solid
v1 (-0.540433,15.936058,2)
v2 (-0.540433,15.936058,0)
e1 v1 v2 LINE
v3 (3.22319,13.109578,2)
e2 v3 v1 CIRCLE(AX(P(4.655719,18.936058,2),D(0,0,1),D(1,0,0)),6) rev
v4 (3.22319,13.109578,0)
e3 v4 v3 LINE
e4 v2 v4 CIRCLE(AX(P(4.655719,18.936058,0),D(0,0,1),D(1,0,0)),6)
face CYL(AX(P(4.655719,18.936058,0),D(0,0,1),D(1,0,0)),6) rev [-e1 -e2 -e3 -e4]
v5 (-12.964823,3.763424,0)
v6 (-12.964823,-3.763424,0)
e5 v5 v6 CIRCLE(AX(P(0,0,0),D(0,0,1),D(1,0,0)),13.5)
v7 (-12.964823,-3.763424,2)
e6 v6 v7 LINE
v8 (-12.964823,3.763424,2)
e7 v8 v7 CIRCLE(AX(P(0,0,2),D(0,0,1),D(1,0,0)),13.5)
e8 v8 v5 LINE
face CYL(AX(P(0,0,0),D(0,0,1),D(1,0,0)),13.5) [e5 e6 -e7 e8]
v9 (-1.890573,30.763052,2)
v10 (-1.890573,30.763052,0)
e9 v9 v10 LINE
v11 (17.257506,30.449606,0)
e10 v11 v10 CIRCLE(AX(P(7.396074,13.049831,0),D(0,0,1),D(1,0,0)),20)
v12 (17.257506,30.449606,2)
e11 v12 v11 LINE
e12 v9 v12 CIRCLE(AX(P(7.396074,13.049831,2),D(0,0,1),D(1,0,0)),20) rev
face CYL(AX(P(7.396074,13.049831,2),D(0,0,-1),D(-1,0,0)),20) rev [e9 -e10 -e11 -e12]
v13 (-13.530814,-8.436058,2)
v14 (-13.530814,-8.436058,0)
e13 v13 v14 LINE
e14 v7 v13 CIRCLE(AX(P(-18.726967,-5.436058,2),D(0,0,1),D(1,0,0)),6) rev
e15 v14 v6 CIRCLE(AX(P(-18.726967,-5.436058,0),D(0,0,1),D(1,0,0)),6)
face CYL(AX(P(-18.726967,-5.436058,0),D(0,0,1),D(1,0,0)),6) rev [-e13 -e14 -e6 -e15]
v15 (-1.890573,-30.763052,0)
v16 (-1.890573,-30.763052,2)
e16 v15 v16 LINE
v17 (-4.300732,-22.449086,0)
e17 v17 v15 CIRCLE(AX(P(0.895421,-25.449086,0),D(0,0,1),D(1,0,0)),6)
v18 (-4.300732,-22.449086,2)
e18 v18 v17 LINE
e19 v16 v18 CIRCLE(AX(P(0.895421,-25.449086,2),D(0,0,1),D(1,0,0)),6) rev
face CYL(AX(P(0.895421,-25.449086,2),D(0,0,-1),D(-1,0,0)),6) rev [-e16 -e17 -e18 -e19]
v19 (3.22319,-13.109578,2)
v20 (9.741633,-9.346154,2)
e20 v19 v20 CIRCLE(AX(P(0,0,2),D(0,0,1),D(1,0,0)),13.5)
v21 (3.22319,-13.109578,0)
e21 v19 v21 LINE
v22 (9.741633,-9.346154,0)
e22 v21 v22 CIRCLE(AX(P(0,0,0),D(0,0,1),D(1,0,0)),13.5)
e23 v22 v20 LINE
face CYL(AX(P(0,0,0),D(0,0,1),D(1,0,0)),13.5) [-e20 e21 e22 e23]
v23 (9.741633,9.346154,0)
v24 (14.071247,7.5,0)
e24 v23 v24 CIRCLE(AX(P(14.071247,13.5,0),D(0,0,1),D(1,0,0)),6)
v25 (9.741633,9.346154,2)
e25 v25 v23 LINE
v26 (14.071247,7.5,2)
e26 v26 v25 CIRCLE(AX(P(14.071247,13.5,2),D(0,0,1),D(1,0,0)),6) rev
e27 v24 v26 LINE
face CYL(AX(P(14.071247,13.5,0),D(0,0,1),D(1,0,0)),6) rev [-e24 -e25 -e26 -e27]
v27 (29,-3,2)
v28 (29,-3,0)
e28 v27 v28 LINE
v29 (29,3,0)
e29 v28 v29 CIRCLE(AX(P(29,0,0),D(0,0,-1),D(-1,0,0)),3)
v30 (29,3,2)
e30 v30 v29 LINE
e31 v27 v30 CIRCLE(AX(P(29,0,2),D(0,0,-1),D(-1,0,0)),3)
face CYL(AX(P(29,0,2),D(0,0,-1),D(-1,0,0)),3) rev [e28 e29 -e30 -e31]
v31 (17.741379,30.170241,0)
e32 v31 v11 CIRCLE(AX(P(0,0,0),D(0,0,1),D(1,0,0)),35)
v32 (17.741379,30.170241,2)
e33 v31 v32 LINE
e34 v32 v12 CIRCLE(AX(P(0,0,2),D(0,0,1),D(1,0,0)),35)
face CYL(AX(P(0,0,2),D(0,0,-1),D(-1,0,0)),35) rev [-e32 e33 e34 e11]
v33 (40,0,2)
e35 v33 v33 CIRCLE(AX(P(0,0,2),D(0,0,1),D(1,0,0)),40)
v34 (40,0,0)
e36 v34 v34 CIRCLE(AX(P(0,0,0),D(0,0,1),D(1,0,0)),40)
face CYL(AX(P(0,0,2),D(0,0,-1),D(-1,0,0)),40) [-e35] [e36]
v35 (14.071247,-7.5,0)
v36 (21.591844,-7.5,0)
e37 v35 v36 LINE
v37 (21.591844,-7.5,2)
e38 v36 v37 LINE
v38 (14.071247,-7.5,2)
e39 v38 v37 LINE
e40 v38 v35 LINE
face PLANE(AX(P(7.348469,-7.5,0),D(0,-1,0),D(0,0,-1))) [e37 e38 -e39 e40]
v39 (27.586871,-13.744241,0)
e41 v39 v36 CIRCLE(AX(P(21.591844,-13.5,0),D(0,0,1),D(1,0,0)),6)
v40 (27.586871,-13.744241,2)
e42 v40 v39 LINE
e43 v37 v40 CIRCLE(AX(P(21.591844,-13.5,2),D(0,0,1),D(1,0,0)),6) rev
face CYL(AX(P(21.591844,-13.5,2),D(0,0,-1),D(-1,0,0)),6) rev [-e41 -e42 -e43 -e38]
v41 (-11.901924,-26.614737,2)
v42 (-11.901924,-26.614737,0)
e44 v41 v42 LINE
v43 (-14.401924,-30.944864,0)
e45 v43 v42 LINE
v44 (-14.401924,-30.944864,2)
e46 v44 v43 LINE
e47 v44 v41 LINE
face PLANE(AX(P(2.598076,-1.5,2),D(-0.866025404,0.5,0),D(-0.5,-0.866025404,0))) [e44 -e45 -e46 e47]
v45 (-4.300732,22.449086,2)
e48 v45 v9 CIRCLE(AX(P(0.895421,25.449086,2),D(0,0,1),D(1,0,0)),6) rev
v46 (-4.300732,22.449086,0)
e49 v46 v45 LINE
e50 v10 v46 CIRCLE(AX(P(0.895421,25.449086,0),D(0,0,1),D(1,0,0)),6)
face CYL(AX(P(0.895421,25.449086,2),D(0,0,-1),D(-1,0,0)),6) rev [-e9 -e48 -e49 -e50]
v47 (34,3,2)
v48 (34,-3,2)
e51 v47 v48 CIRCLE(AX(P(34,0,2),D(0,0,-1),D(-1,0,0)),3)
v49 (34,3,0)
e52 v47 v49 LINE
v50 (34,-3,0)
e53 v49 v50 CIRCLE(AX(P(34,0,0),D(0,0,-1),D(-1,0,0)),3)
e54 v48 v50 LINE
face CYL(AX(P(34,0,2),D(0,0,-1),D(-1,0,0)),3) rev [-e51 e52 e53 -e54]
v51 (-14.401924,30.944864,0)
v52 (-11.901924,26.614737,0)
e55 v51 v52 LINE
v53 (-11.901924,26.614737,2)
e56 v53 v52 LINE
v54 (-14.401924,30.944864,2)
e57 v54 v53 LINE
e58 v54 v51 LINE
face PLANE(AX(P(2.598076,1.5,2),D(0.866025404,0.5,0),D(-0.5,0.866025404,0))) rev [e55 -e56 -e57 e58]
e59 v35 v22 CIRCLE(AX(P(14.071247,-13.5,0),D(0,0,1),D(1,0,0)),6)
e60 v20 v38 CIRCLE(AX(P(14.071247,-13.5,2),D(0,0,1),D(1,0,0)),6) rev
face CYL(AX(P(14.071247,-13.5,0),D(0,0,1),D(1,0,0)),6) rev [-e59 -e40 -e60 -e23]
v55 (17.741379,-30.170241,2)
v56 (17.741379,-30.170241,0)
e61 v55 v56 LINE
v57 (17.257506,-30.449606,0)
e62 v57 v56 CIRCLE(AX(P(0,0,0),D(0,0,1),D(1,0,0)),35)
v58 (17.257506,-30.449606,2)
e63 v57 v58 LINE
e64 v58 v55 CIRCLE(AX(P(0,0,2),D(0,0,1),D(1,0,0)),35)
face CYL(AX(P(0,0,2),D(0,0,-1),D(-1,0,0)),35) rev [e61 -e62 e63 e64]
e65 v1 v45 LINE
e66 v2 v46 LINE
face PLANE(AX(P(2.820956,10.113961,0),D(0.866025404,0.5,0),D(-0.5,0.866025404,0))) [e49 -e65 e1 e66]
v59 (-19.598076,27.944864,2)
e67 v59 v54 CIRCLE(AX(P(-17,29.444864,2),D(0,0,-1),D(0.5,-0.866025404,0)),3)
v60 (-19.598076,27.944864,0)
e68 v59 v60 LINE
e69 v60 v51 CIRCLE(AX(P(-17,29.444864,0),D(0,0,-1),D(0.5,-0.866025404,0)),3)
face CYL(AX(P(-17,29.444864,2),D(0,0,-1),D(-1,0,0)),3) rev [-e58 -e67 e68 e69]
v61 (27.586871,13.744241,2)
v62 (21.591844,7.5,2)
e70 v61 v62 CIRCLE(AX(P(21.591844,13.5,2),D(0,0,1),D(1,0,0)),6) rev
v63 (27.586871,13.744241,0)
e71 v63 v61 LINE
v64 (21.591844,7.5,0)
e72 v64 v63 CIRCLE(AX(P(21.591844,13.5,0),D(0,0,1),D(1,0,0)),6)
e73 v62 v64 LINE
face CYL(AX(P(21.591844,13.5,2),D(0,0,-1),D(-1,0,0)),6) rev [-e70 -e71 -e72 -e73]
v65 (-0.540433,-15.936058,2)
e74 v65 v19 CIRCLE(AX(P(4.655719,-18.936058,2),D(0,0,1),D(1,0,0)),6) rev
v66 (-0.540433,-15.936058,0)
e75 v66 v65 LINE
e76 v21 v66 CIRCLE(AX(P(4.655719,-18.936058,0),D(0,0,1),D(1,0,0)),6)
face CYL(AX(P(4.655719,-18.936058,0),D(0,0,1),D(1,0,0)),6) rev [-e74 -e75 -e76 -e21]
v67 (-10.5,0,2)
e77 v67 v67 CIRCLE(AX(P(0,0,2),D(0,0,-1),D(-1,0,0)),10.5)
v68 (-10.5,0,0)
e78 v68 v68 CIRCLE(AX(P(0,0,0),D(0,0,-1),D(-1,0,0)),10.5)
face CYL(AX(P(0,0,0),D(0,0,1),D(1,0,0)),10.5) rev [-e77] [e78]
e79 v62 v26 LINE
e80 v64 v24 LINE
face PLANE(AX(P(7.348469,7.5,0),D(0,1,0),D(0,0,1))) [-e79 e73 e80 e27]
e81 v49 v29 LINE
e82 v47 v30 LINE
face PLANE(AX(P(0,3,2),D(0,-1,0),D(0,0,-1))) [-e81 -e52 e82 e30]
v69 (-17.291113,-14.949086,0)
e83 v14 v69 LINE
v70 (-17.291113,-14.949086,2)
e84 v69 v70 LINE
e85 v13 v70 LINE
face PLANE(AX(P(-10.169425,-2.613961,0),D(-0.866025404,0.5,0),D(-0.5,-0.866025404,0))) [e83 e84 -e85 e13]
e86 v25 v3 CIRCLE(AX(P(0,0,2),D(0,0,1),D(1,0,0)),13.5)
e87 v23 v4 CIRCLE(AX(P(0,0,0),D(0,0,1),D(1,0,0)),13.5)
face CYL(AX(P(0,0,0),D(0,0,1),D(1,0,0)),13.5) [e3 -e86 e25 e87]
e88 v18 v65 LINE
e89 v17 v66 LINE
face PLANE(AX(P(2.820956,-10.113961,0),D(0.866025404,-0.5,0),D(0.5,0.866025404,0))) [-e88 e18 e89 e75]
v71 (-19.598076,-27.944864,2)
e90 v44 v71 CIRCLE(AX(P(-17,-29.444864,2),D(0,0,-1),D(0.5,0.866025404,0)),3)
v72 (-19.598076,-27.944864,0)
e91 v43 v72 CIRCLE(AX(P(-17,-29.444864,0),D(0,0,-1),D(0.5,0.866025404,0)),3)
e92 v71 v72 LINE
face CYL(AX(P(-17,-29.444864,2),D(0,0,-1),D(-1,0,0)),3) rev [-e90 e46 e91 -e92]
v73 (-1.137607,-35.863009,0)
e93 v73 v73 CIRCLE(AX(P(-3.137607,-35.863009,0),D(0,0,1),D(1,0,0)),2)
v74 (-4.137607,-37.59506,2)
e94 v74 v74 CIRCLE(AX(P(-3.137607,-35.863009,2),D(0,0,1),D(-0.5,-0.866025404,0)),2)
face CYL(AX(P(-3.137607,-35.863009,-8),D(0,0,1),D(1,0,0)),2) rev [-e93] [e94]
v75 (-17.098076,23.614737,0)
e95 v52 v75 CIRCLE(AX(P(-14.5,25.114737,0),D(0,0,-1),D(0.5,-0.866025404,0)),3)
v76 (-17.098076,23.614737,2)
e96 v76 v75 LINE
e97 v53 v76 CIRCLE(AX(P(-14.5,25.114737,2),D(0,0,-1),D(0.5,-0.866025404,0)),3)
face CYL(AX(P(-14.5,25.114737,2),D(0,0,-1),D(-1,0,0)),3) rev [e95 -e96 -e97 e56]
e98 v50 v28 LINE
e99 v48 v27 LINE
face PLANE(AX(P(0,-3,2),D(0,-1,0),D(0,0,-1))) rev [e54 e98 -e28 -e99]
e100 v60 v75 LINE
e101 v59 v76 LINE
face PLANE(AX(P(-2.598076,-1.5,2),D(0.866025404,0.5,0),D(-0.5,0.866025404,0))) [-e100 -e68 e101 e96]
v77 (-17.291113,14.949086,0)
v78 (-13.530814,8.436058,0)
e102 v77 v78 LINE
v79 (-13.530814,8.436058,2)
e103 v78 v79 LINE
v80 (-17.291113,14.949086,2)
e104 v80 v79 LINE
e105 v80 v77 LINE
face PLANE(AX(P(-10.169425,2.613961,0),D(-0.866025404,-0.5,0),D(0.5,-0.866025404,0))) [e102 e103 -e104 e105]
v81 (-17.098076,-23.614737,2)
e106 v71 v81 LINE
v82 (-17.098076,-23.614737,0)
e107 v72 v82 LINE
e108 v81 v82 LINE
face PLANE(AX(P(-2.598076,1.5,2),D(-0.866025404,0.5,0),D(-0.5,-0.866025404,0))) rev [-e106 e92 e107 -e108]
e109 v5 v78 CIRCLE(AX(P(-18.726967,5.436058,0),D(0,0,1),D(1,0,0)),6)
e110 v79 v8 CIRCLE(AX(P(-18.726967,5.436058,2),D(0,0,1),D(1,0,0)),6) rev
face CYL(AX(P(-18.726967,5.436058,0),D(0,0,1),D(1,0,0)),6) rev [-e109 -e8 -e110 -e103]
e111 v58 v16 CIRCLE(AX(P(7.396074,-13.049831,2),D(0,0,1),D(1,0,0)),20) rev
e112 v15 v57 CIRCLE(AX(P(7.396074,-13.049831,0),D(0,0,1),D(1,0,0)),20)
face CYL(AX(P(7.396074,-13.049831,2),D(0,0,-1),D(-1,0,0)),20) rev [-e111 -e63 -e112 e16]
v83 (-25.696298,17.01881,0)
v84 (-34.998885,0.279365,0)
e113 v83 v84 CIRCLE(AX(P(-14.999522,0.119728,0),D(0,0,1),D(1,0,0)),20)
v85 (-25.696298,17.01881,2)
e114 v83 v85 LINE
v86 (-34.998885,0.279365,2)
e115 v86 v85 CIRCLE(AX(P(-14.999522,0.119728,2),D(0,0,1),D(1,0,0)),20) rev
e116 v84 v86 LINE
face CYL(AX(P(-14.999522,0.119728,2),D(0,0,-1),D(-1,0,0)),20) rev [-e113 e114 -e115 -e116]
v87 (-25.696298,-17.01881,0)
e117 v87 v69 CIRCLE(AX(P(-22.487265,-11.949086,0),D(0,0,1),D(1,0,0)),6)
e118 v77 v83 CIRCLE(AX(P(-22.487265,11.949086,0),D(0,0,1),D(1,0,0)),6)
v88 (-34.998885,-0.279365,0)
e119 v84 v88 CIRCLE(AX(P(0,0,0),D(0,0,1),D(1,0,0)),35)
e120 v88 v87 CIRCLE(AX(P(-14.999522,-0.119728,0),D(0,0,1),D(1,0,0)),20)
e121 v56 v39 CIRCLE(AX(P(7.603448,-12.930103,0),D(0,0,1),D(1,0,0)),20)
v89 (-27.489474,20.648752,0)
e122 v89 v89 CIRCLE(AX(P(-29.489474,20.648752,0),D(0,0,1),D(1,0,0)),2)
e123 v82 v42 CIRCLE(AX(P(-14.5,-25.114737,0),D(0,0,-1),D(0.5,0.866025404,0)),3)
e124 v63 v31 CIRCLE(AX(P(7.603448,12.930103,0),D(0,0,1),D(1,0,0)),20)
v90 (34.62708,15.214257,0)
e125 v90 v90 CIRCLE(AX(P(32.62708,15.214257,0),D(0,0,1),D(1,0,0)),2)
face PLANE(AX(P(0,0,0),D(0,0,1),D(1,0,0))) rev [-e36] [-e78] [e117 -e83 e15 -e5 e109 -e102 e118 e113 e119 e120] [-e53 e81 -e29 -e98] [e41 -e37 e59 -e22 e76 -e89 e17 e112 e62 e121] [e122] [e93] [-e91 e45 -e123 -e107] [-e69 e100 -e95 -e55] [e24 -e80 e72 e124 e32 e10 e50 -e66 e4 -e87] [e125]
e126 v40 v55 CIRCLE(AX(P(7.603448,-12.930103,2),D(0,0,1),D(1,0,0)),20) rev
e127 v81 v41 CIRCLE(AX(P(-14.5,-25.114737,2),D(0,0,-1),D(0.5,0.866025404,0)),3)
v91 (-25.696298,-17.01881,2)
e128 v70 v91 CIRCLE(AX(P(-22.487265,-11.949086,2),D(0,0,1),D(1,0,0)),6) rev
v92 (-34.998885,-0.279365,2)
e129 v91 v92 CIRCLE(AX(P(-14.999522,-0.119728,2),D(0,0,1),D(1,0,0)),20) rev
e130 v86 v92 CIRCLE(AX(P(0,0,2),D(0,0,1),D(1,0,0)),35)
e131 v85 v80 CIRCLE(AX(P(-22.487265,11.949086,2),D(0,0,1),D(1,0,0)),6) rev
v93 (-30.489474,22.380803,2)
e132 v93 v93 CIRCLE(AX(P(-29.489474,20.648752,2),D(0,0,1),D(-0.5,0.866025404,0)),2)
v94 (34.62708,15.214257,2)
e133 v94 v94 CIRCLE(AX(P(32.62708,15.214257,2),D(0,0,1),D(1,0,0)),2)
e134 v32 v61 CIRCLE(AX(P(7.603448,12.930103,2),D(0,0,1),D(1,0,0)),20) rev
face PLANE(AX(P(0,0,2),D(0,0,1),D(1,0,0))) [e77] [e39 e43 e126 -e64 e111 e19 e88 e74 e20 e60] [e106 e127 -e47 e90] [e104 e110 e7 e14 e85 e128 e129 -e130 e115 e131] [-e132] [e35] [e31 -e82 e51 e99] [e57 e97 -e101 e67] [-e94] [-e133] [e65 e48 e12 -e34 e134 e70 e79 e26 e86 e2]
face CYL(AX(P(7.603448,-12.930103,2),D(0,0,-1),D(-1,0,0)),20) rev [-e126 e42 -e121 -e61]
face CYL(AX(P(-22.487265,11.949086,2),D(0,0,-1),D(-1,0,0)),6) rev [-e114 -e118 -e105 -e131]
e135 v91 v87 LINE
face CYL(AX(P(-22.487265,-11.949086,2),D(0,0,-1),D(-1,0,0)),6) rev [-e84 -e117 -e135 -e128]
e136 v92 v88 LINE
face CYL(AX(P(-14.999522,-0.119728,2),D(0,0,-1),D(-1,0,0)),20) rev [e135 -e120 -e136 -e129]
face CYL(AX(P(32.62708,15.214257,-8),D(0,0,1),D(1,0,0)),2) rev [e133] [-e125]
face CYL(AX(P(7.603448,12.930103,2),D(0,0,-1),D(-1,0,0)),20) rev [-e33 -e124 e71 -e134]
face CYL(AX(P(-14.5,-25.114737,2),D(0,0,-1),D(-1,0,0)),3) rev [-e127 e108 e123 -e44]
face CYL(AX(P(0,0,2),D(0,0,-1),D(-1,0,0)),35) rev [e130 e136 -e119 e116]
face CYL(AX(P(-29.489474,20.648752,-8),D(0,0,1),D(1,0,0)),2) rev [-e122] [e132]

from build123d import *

# Parameters (mm, degrees)
SKETCH1_R                = 40
SKETCH1_R_2              = 35
BOSS_EXTRUDE1_DEPTH      = 2
BOSS_EXTRUDE2_DEPTH      = 2
SKETCH3_R                = 3
CUT_EXTRUDE1_DEPTH       = 2
FILLET1_DEPTH            = 2
SKETCH4_R                = 2
CUT_EXTRUDE2_DEPTH       = 10
BOSS_EXTRUDE3_START      = -2
BOSS_EXTRUDE3_DEPTH      = 2
BOSS_EXTRUDE4_START      = -2
SKETCH7_R                = 13.5
SKETCH7_R_2              = 10.5
BOSS_EXTRUDE4_DEPTH      = 2
FILLET2_R                = 6
CIRPATTERN1_COUNT        = 3
FILLET2_OF_CIRPATTERN1_R = 6


with BuildPart() as part:
    # Sketch1 → Boss-Extrude1 (new body)
    with BuildSketch(Plane.XY):
        Circle(SKETCH1_R)
        Circle(SKETCH1_R_2, mode=Mode.SUBTRACT)
    extrude(amount=BOSS_EXTRUDE1_DEPTH)

    # Sketch2 → Boss-Extrude2 (add)
    with BuildSketch(Plane(origin=(0, 0, 0), x_dir=(-1, 0, 0), z_dir=(0, 0, -1))):
        with BuildLine():
            Line((-29, 5), (-34.641016151, 5))
            Line((-34.641016151, 5), (-37.165171868, 5))
            ThreePointArc((-37.165171868, 5), (-37.5, 0), (-37.165171868, -5))
            Line((-37.165171868, -5), (-29, -5))
            ThreePointArc((-29, -5), (-24, 0), (-29, 5))
        make_face()
        with BuildLine():
            Line((-34, -3), (-29, -3))
            ThreePointArc((-29, -3), (-26, 0), (-29, 3))
            Line((-29, 3), (-34, 3))
            ThreePointArc((-34, 3), (-37, 0), (-34, -3))
        make_face(mode=Mode.SUBTRACT)
    boss_extrude2 = extrude(amount=-BOSS_EXTRUDE2_DEPTH)

    # Sketch3 → Cut-Extrude1 (cut)
    with BuildSketch(Plane(origin=(0, 0, 0), x_dir=(-1, 0, 0), z_dir=(0, 0, -1))):
        with Locations((-34, 0)):
            Circle(SKETCH3_R)
    cut_extrude1 = extrude(amount=-CUT_EXTRUDE1_DEPTH, mode=Mode.SUBTRACT)

    # Fillet1: read off the stored shape, not the designer's step
    # Fillet1 outline → Fillet1 (add)
    with BuildSketch(Plane.XY):
        with BuildLine():
            ThreePointArc((29, -5), (26.543386825, -4.354888254), (24.720689655, -2.586020683))
            ThreePointArc((24.720689655, -2.586020683), (26.992450638, -17.835874241), (17.74137931, -30.170241301))
            ThreePointArc((17.74137931, -30.170241301), (29.057943842, -19.509892353), (34.641016151, -5))
            Line((34.641016151, -5), (29, -5))
        make_face()
        with BuildLine():
            ThreePointArc((17.74137931, 30.170241301), (26.992450638, 17.835874241), (24.720689655, 2.586020683))
            ThreePointArc((24.720689655, 2.586020683), (26.543386825, 4.354888254), (29, 5))
            Line((29, 5), (34.641016151, 5))
            ThreePointArc((34.641016151, 5), (29.057943842, 19.509892353), (17.74137931, 30.170241301))
        make_face()
    fillet1 = extrude(amount=FILLET1_DEPTH)

    # Sketch4 → Cut-Extrude2 (cut)
    with BuildSketch(Plane.XY.offset(2)):
        with Locations((32.627080333, 15.214257423)):
            Circle(SKETCH4_R)
    cut_extrude2 = extrude(amount=-CUT_EXTRUDE2_DEPTH, mode=Mode.SUBTRACT)

    # Sketch5 → Boss-Extrude3 (add)
    with BuildSketch(Plane.XY.offset(2).offset(BOSS_EXTRUDE3_START)):
        with BuildLine():
            Line((7.348469228, 7.5), (34.186985828, 7.5))
            ThreePointArc((34.186985828, 7.5), (34.60231879, 5.261134323), (34.871191548, 3))
            Line((34.871191548, 3), (29, 3))
            ThreePointArc((29, 3), (26, 0), (29, -3))
            Line((29, -3), (34.871191548, -3))
            ThreePointArc((34.871191548, -3), (34.60231879, -5.261134323), (34.186985828, -7.5))
            Line((34.186985828, -7.5), (7.348469228, -7.5))
            ThreePointArc((7.348469228, -7.5), (10.5, 0), (7.348469228, 7.5))
        make_face()
    boss_extrude3 = extrude(amount=BOSS_EXTRUDE3_DEPTH)

    # Sketch7 → Boss-Extrude4 (add)
    with BuildSketch(Plane.XY.offset(2).offset(BOSS_EXTRUDE4_START)):
        Circle(SKETCH7_R)
        with Locations(Location((0, 0, 0), (0, 0, 180))):
            Circle(SKETCH7_R_2, mode=Mode.SUBTRACT)
    extrude(amount=BOSS_EXTRUDE4_DEPTH)

    # Fillet2
    fillet2_edges = [part.edges().sort_by_distance(p)[0] for p in [
        (11.22497216, 7.5, 1),
        (11.22497216, -7.5, 1),
        (26.852187894, 7.5, 1),
        (26.852187894, -7.5, 1),
    ]]
    fillet(fillet2_edges, radius=FILLET2_R)

    # CirPattern1: Boss-Extrude2, Cut-Extrude1, Fillet1, Cut-Extrude2, Boss-Extrude3 ×3 about axis
    cirpattern1_axis = Axis((0, 0, 0), (0, 0, 1))
    add([boss_extrude2.rotate(cirpattern1_axis, i * 360 / CIRPATTERN1_COUNT) for i in range(1, CIRPATTERN1_COUNT)])
    add([cut_extrude1.rotate(cirpattern1_axis, i * 360 / CIRPATTERN1_COUNT) for i in range(1, CIRPATTERN1_COUNT)], mode=Mode.SUBTRACT)
    add([fillet1.rotate(cirpattern1_axis, i * 360 / CIRPATTERN1_COUNT) for i in range(1, CIRPATTERN1_COUNT)])
    add([cut_extrude2.rotate(cirpattern1_axis, i * 360 / CIRPATTERN1_COUNT) for i in range(1, CIRPATTERN1_COUNT)], mode=Mode.SUBTRACT)
    add([boss_extrude3.rotate(cirpattern1_axis, i * 360 / CIRPATTERN1_COUNT) for i in range(1, CIRPATTERN1_COUNT)])

    # Fillet2 of CirPattern1
    fillet2_of_cirpattern1_edges = [part.edges().sort_by_distance(p)[0] for p in [
        (-12.107676609, 5.971111048, 1),
        (0.882704448, 13.471111048, 1),
        (-19.921284476, 19.504676864, 1),
        (-6.930903419, 27.004676864, 1),
        (0.882704448, -13.471111048, 1),
        (-12.107676609, -5.971111048, 1),
        (-6.930903419, -27.004676864, 1),
        (-19.921284476, -19.504676864, 1),
    ]]
    fillet(fillet2_of_cirpattern1_edges, radius=FILLET2_OF_CIRPATTERN1_R)


solid = part.part
